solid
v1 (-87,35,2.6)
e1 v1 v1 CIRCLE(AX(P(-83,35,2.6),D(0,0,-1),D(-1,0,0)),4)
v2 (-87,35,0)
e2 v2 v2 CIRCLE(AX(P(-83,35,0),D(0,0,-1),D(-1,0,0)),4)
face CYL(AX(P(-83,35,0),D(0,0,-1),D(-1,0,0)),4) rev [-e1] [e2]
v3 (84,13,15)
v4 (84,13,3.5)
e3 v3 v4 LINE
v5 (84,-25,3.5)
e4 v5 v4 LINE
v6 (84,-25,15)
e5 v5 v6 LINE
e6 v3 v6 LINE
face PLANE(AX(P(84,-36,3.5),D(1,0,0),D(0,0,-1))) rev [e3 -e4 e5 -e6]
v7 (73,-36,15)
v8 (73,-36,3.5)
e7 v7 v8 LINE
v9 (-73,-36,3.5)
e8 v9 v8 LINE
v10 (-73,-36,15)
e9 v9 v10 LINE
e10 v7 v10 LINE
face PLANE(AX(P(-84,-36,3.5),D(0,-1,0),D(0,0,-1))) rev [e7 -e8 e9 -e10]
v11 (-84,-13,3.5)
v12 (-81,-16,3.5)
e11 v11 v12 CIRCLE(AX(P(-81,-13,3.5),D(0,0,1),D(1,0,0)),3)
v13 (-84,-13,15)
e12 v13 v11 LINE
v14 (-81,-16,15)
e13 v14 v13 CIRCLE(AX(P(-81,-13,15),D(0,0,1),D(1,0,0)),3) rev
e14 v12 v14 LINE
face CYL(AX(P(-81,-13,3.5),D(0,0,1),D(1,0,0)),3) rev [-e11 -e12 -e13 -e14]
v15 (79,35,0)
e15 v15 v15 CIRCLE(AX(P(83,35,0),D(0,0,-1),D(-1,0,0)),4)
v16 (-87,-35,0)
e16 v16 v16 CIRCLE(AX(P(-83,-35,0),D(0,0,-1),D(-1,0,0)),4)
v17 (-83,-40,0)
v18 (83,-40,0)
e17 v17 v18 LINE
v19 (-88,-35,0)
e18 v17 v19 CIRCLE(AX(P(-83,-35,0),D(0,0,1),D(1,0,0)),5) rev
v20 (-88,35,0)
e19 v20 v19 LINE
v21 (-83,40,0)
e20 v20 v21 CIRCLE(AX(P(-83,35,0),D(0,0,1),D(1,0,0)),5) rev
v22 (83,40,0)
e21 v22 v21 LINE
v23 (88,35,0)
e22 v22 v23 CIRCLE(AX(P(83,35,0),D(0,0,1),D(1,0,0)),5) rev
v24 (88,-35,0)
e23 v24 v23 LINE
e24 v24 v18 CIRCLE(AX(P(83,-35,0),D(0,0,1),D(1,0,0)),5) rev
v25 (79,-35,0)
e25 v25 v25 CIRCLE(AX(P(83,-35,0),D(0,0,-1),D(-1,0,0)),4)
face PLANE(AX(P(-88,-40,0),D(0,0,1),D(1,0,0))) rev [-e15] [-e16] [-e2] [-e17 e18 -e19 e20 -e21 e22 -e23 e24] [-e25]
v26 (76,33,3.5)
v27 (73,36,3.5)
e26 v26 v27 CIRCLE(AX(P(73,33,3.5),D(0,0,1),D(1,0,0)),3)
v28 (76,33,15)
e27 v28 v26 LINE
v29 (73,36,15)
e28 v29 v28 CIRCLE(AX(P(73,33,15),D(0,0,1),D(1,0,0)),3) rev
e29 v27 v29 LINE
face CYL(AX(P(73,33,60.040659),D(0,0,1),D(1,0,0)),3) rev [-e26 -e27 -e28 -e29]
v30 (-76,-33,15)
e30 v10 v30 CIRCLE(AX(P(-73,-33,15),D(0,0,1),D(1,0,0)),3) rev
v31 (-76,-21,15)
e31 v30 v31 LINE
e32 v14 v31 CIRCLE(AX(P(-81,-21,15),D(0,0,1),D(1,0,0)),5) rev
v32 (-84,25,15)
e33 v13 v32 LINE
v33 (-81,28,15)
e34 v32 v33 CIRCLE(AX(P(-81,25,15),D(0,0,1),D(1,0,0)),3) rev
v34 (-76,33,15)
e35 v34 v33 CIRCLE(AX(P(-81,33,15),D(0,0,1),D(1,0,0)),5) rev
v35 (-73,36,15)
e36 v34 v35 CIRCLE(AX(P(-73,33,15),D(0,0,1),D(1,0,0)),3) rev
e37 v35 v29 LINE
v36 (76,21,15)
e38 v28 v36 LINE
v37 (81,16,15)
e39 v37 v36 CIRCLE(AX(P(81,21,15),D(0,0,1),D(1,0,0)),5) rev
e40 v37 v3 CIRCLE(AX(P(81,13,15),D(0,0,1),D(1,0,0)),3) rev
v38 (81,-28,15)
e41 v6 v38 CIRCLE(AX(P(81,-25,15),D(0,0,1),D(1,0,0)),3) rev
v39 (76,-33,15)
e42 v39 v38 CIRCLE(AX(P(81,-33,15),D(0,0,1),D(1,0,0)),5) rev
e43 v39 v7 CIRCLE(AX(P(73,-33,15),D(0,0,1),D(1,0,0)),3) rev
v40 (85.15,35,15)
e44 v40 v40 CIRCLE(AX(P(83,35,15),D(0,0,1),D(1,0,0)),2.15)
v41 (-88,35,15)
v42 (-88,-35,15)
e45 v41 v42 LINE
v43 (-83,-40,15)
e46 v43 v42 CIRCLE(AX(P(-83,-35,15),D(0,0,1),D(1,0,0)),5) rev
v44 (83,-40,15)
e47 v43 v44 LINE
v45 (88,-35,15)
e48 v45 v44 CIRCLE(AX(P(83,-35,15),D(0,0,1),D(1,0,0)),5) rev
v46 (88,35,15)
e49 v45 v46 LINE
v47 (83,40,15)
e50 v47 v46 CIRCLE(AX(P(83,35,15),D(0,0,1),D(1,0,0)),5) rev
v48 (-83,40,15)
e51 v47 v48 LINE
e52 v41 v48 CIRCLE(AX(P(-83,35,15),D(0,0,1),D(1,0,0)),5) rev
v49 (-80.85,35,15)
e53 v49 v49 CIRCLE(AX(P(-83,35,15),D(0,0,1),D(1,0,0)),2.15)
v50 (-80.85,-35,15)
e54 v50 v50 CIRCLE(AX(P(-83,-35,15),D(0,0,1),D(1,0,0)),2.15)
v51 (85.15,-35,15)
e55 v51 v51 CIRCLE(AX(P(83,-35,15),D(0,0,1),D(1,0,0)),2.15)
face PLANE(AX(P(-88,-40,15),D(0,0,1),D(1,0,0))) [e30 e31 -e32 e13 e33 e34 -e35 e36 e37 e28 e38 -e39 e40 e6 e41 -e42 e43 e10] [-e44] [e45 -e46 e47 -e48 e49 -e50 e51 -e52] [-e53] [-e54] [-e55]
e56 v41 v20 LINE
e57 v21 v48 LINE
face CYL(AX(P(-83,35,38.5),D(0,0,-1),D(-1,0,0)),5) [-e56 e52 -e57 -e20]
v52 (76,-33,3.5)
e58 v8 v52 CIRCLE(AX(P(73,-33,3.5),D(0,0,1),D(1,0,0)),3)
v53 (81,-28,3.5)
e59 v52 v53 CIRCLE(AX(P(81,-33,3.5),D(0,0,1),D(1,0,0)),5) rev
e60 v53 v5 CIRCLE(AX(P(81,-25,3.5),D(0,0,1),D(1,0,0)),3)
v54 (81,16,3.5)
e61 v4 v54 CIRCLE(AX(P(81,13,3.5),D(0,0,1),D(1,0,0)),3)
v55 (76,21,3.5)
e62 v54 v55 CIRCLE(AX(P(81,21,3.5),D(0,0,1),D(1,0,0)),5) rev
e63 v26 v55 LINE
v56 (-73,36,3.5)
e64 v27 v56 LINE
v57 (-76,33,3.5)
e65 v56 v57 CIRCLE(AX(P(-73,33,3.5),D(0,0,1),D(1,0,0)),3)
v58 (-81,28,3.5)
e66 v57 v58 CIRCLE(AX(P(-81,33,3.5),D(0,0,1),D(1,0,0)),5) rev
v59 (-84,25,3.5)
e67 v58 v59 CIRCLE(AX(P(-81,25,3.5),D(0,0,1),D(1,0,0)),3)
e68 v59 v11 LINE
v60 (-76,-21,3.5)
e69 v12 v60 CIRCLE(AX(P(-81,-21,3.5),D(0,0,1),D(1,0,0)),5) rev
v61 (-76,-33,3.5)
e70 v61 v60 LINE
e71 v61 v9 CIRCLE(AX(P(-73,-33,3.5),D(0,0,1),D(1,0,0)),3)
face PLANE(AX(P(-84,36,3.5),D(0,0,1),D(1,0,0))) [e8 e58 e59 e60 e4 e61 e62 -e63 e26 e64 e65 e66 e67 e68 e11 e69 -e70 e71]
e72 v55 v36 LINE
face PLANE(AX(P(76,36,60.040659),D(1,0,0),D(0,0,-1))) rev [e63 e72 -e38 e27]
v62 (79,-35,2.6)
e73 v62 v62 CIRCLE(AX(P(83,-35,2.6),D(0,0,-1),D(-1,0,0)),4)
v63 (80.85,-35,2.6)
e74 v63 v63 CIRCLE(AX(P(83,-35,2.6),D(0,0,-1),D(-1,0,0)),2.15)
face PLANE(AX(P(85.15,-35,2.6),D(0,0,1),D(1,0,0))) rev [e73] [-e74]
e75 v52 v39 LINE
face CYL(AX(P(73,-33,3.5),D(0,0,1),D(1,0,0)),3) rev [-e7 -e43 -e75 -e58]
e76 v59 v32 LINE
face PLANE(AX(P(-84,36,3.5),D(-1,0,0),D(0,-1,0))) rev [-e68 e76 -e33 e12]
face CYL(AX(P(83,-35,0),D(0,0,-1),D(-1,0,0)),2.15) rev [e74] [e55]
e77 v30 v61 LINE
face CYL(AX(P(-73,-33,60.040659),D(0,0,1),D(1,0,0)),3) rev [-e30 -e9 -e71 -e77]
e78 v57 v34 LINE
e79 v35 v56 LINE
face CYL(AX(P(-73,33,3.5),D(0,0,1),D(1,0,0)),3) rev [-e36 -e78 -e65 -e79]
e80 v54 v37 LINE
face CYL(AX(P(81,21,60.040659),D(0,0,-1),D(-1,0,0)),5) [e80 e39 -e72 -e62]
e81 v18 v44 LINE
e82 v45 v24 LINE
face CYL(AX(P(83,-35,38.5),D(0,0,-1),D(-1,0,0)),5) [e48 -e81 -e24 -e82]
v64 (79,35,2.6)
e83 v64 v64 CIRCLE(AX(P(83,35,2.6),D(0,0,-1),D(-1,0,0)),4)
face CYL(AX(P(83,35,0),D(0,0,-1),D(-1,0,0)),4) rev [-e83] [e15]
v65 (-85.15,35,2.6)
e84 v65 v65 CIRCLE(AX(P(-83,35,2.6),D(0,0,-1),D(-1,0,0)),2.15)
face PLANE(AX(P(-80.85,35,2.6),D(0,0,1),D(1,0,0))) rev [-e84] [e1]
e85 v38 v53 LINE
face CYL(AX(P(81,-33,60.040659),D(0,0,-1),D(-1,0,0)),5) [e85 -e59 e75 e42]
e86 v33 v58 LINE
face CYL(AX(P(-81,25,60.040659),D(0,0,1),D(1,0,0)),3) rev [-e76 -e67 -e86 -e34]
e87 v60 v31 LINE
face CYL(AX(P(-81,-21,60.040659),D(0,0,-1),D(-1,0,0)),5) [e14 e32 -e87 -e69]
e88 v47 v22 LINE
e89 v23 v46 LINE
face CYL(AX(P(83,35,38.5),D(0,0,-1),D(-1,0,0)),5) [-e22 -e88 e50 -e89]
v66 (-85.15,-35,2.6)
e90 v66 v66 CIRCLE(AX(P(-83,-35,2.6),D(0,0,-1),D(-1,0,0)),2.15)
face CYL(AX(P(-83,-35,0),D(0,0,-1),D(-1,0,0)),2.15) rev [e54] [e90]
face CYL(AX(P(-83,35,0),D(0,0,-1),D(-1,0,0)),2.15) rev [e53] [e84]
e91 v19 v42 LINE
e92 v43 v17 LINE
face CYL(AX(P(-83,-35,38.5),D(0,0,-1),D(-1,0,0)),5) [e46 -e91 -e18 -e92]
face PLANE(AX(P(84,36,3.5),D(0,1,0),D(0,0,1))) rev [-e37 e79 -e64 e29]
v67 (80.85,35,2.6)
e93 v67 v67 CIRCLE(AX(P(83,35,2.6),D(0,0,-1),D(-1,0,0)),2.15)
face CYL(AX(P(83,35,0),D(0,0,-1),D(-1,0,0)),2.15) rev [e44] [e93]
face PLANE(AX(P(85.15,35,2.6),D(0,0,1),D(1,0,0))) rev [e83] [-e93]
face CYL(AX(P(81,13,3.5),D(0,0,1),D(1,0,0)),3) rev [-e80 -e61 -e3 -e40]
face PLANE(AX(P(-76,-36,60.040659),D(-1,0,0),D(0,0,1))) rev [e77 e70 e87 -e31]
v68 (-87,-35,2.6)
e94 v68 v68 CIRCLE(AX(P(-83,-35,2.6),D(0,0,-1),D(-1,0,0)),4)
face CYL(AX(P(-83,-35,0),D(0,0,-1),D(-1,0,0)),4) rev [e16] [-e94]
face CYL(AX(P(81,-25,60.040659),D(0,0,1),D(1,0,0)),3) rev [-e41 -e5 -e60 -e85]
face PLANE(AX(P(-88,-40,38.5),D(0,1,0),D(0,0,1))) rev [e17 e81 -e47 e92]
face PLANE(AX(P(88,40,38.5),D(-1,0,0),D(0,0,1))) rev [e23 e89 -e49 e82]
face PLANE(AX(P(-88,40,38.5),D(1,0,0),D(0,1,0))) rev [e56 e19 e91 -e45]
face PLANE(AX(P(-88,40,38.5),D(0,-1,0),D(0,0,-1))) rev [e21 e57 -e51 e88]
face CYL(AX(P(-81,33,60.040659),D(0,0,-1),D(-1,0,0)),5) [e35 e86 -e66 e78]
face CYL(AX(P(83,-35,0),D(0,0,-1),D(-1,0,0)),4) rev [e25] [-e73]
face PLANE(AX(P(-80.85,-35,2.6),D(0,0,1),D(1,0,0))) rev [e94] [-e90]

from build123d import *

# Parameters (mm, degrees)
SKETCH1_W                                   = 176
SKETCH1_H                                   = 80
BOSS_EXTRUDE1_DEPTH                         = 38.5
SKETCH2_W                                   = 168
SKETCH2_H                                   = 72
CUT_EXTRUDE1_DEPTH                          = 35
FILLET2_R                                   = 5
SKETCH8_W                                   = 8
SKETCH8_H                                   = 20
SKETCH8_H_2                                 = 8
BOSS_EXTRUDE2_DEPTH                         = 35
FILLET4_R                                   = 3
FILLET5_R                                   = 5
M4_TAPPED_HOLE1_D                           = 3.3
M4_TAPPED_HOLE1_DEPTH                       = 11.5
M4_TAPPED_HOLE1_TIP                         = 0.991420021
BOSS_EXTRUDE3_START                         = 1.5
BOSS_EXTRUDE3_DEPTH                         = 1.5
SKETCH25_W                                  = 192.92581759
SKETCH25_H                                  = 92.850065769
CUT_EXTRUDE4_DEPTH                          = 25
CBORE_FOR_M4_CHEESE_HEAD_SCREW2_D           = 4.3
CBORE_FOR_M4_CHEESE_HEAD_SCREW2_CBORE_D     = 8
CBORE_FOR_M4_CHEESE_HEAD_SCREW2_CBORE_DEPTH = 2.6


with BuildPart() as part:
    # Sketch1 → Boss-Extrude1 (new body)
    with BuildSketch(Plane.XY):
        Rectangle(SKETCH1_W, SKETCH1_H)
    extrude(amount=BOSS_EXTRUDE1_DEPTH)

    # Sketch2 → Cut-Extrude1 (cut)
    with BuildSketch(Plane.XY.offset(38.5)):
        Rectangle(SKETCH2_W, SKETCH2_H)
    extrude(amount=-CUT_EXTRUDE1_DEPTH, mode=Mode.SUBTRACT)

    # Fillet2
    fillet2_edges = [part.edges().sort_by_distance(p)[0] for p in [
        (-88, 40, 19.25),
        (88, 40, 19.25),
        (88, -40, 19.25),
        (-88, -40, 19.25),
    ]]
    fillet(fillet2_edges, radius=FILLET2_R)

    # Sketch8 → Boss-Extrude2 (add)
    with BuildSketch(Plane.XY.offset(3.5)):
        with Locations((80, 26)):
            Rectangle(SKETCH8_W, SKETCH8_H)
        with Locations((80, -32)):
            Rectangle(SKETCH8_W, SKETCH8_H_2)
        with Locations((-80, -26)):
            Rectangle(SKETCH8_W, SKETCH8_H)
        with Locations((-80, 32)):
            Rectangle(SKETCH8_W, SKETCH8_H_2)
    extrude(amount=BOSS_EXTRUDE2_DEPTH)

    # Fillet4
    fillet4_edges = [part.edges().sort_by_distance(p)[0] for p in [
        (76, 36, 21),
        (84, 16, 21),
        (84, -28, 21),
        (76, -36, 21),
        (-76, -36, 21),
        (-84, -16, 21),
        (-84, 28, 21),
        (-76, 36, 21),
    ]]
    fillet(fillet4_edges, radius=FILLET4_R)

    # Fillet5
    fillet5_edges = [part.edges().sort_by_distance(p)[0] for p in [
        (-76, -16, 21),
        (76, -28, 21),
        (76, 16, 21),
        (-76, 28, 21),
    ]]
    fillet(fillet5_edges, radius=FILLET5_R - 0.0001)  # a hair under: the kernel refuses the full size

    # M4 Tapped Hole1
    with Locations(Plane.XY.offset(38.5)):
        with Locations((-83, -35), (83, 35), (-83, 35), (83, -35)):
            Hole(M4_TAPPED_HOLE1_D / 2, depth=M4_TAPPED_HOLE1_DEPTH)
            with Locations((0, 0, -(M4_TAPPED_HOLE1_DEPTH + M4_TAPPED_HOLE1_TIP / 2))):  # 118° drill point
                Cone(0, M4_TAPPED_HOLE1_D / 2, M4_TAPPED_HOLE1_TIP, mode=Mode.SUBTRACT)

    # Sketch9 → Boss-Extrude3 (add)
    with BuildSketch(Plane.XY.offset(38.5).offset(BOSS_EXTRUDE3_START)):
        with BuildLine():
            Line((73, 37.5), (-73, 37.5))
            ThreePointArc((-73, 37.5), (-76.181980515, 36.181980515), (-77.5, 33))
            ThreePointArc((-77.5, 33), (-78.525126266, 30.525126266), (-81, 29.5))
            ThreePointArc((-81, 29.5), (-84.181980515, 28.181980515), (-85.5, 25))
            Line((-85.5, 25), (-85.5, -13))
            ThreePointArc((-85.5, -13), (-84.181980515, -16.181980515), (-81, -17.5))
            ThreePointArc((-81, -17.5), (-78.525126266, -18.525126266), (-77.5, -21))
            Line((-77.5, -21), (-77.5, -33))
            ThreePointArc((-77.5, -33), (-76.181980515, -36.181980515), (-73, -37.5))
            Line((-73, -37.5), (73, -37.5))
            ThreePointArc((73, -37.5), (76.181980515, -36.181980515), (77.5, -33))
            ThreePointArc((77.5, -33), (78.525126266, -30.525126266), (81, -29.5))
            ThreePointArc((81, -29.5), (84.181980515, -28.181980515), (85.5, -25))
            Line((85.5, -25), (85.5, 13))
            ThreePointArc((85.5, 13), (84.181980515, 16.181980515), (81, 17.5))
            ThreePointArc((81, 17.5), (78.525126266, 18.525126266), (77.5, 21))
            Line((77.5, 21), (77.5, 33))
            ThreePointArc((77.5, 33), (76.181980515, 36.181980515), (73, 37.5))
        make_face()
        with BuildLine():
            Line((73, 36), (-73, 36))
            ThreePointArc((-73, 36), (-75.121320344, 35.121320344), (-76, 33))
            ThreePointArc((-76, 33), (-77.464466094, 29.464466094), (-81, 28))
            ThreePointArc((-81, 28), (-83.121320344, 27.121320344), (-84, 25))
            Line((-84, 25), (-84, -13))
            ThreePointArc((-84, -13), (-83.121320344, -15.121320344), (-81, -16))
            ThreePointArc((-81, -16), (-77.464466094, -17.464466094), (-76, -21))
            Line((-76, -21), (-76, -33))
            ThreePointArc((-76, -33), (-75.121320344, -35.121320344), (-73, -36))
            Line((-73, -36), (73, -36))
            ThreePointArc((73, -36), (75.121320344, -35.121320344), (76, -33))
            ThreePointArc((76, -33), (77.464466094, -29.464466094), (81, -28))
            ThreePointArc((81, -28), (83.121320344, -27.121320344), (84, -25))
            Line((84, -25), (84, 13))
            ThreePointArc((84, 13), (83.121320344, 15.121320344), (81, 16))
            ThreePointArc((81, 16), (77.464466094, 17.464466094), (76, 21))
            Line((76, 21), (76, 33))
            ThreePointArc((76, 33), (75.121320344, 35.121320344), (73, 36))
        make_face(mode=Mode.SUBTRACT)
    extrude(amount=-BOSS_EXTRUDE3_DEPTH)

    # Sketch25 → Cut-Extrude4 (cut)
    with BuildSketch(Plane.XY.offset(40)):
        with Locations((-2.348347967, 1.083852907)):
            Rectangle(SKETCH25_W, SKETCH25_H)
    extrude(amount=-CUT_EXTRUDE4_DEPTH, mode=Mode.SUBTRACT)

    # CBORE for M4 Cheese Head Screw2 (through all)
    with Locations(Plane(origin=(0, 0, 0), x_dir=(-1, 0, 0), z_dir=(0, 0, -1))):
        with Locations((-83, 35), (83, 35), (83, -35), (-83, -35)):
            CounterBoreHole(CBORE_FOR_M4_CHEESE_HEAD_SCREW2_D / 2, CBORE_FOR_M4_CHEESE_HEAD_SCREW2_CBORE_D / 2, CBORE_FOR_M4_CHEESE_HEAD_SCREW2_CBORE_DEPTH)


solid = part.part
